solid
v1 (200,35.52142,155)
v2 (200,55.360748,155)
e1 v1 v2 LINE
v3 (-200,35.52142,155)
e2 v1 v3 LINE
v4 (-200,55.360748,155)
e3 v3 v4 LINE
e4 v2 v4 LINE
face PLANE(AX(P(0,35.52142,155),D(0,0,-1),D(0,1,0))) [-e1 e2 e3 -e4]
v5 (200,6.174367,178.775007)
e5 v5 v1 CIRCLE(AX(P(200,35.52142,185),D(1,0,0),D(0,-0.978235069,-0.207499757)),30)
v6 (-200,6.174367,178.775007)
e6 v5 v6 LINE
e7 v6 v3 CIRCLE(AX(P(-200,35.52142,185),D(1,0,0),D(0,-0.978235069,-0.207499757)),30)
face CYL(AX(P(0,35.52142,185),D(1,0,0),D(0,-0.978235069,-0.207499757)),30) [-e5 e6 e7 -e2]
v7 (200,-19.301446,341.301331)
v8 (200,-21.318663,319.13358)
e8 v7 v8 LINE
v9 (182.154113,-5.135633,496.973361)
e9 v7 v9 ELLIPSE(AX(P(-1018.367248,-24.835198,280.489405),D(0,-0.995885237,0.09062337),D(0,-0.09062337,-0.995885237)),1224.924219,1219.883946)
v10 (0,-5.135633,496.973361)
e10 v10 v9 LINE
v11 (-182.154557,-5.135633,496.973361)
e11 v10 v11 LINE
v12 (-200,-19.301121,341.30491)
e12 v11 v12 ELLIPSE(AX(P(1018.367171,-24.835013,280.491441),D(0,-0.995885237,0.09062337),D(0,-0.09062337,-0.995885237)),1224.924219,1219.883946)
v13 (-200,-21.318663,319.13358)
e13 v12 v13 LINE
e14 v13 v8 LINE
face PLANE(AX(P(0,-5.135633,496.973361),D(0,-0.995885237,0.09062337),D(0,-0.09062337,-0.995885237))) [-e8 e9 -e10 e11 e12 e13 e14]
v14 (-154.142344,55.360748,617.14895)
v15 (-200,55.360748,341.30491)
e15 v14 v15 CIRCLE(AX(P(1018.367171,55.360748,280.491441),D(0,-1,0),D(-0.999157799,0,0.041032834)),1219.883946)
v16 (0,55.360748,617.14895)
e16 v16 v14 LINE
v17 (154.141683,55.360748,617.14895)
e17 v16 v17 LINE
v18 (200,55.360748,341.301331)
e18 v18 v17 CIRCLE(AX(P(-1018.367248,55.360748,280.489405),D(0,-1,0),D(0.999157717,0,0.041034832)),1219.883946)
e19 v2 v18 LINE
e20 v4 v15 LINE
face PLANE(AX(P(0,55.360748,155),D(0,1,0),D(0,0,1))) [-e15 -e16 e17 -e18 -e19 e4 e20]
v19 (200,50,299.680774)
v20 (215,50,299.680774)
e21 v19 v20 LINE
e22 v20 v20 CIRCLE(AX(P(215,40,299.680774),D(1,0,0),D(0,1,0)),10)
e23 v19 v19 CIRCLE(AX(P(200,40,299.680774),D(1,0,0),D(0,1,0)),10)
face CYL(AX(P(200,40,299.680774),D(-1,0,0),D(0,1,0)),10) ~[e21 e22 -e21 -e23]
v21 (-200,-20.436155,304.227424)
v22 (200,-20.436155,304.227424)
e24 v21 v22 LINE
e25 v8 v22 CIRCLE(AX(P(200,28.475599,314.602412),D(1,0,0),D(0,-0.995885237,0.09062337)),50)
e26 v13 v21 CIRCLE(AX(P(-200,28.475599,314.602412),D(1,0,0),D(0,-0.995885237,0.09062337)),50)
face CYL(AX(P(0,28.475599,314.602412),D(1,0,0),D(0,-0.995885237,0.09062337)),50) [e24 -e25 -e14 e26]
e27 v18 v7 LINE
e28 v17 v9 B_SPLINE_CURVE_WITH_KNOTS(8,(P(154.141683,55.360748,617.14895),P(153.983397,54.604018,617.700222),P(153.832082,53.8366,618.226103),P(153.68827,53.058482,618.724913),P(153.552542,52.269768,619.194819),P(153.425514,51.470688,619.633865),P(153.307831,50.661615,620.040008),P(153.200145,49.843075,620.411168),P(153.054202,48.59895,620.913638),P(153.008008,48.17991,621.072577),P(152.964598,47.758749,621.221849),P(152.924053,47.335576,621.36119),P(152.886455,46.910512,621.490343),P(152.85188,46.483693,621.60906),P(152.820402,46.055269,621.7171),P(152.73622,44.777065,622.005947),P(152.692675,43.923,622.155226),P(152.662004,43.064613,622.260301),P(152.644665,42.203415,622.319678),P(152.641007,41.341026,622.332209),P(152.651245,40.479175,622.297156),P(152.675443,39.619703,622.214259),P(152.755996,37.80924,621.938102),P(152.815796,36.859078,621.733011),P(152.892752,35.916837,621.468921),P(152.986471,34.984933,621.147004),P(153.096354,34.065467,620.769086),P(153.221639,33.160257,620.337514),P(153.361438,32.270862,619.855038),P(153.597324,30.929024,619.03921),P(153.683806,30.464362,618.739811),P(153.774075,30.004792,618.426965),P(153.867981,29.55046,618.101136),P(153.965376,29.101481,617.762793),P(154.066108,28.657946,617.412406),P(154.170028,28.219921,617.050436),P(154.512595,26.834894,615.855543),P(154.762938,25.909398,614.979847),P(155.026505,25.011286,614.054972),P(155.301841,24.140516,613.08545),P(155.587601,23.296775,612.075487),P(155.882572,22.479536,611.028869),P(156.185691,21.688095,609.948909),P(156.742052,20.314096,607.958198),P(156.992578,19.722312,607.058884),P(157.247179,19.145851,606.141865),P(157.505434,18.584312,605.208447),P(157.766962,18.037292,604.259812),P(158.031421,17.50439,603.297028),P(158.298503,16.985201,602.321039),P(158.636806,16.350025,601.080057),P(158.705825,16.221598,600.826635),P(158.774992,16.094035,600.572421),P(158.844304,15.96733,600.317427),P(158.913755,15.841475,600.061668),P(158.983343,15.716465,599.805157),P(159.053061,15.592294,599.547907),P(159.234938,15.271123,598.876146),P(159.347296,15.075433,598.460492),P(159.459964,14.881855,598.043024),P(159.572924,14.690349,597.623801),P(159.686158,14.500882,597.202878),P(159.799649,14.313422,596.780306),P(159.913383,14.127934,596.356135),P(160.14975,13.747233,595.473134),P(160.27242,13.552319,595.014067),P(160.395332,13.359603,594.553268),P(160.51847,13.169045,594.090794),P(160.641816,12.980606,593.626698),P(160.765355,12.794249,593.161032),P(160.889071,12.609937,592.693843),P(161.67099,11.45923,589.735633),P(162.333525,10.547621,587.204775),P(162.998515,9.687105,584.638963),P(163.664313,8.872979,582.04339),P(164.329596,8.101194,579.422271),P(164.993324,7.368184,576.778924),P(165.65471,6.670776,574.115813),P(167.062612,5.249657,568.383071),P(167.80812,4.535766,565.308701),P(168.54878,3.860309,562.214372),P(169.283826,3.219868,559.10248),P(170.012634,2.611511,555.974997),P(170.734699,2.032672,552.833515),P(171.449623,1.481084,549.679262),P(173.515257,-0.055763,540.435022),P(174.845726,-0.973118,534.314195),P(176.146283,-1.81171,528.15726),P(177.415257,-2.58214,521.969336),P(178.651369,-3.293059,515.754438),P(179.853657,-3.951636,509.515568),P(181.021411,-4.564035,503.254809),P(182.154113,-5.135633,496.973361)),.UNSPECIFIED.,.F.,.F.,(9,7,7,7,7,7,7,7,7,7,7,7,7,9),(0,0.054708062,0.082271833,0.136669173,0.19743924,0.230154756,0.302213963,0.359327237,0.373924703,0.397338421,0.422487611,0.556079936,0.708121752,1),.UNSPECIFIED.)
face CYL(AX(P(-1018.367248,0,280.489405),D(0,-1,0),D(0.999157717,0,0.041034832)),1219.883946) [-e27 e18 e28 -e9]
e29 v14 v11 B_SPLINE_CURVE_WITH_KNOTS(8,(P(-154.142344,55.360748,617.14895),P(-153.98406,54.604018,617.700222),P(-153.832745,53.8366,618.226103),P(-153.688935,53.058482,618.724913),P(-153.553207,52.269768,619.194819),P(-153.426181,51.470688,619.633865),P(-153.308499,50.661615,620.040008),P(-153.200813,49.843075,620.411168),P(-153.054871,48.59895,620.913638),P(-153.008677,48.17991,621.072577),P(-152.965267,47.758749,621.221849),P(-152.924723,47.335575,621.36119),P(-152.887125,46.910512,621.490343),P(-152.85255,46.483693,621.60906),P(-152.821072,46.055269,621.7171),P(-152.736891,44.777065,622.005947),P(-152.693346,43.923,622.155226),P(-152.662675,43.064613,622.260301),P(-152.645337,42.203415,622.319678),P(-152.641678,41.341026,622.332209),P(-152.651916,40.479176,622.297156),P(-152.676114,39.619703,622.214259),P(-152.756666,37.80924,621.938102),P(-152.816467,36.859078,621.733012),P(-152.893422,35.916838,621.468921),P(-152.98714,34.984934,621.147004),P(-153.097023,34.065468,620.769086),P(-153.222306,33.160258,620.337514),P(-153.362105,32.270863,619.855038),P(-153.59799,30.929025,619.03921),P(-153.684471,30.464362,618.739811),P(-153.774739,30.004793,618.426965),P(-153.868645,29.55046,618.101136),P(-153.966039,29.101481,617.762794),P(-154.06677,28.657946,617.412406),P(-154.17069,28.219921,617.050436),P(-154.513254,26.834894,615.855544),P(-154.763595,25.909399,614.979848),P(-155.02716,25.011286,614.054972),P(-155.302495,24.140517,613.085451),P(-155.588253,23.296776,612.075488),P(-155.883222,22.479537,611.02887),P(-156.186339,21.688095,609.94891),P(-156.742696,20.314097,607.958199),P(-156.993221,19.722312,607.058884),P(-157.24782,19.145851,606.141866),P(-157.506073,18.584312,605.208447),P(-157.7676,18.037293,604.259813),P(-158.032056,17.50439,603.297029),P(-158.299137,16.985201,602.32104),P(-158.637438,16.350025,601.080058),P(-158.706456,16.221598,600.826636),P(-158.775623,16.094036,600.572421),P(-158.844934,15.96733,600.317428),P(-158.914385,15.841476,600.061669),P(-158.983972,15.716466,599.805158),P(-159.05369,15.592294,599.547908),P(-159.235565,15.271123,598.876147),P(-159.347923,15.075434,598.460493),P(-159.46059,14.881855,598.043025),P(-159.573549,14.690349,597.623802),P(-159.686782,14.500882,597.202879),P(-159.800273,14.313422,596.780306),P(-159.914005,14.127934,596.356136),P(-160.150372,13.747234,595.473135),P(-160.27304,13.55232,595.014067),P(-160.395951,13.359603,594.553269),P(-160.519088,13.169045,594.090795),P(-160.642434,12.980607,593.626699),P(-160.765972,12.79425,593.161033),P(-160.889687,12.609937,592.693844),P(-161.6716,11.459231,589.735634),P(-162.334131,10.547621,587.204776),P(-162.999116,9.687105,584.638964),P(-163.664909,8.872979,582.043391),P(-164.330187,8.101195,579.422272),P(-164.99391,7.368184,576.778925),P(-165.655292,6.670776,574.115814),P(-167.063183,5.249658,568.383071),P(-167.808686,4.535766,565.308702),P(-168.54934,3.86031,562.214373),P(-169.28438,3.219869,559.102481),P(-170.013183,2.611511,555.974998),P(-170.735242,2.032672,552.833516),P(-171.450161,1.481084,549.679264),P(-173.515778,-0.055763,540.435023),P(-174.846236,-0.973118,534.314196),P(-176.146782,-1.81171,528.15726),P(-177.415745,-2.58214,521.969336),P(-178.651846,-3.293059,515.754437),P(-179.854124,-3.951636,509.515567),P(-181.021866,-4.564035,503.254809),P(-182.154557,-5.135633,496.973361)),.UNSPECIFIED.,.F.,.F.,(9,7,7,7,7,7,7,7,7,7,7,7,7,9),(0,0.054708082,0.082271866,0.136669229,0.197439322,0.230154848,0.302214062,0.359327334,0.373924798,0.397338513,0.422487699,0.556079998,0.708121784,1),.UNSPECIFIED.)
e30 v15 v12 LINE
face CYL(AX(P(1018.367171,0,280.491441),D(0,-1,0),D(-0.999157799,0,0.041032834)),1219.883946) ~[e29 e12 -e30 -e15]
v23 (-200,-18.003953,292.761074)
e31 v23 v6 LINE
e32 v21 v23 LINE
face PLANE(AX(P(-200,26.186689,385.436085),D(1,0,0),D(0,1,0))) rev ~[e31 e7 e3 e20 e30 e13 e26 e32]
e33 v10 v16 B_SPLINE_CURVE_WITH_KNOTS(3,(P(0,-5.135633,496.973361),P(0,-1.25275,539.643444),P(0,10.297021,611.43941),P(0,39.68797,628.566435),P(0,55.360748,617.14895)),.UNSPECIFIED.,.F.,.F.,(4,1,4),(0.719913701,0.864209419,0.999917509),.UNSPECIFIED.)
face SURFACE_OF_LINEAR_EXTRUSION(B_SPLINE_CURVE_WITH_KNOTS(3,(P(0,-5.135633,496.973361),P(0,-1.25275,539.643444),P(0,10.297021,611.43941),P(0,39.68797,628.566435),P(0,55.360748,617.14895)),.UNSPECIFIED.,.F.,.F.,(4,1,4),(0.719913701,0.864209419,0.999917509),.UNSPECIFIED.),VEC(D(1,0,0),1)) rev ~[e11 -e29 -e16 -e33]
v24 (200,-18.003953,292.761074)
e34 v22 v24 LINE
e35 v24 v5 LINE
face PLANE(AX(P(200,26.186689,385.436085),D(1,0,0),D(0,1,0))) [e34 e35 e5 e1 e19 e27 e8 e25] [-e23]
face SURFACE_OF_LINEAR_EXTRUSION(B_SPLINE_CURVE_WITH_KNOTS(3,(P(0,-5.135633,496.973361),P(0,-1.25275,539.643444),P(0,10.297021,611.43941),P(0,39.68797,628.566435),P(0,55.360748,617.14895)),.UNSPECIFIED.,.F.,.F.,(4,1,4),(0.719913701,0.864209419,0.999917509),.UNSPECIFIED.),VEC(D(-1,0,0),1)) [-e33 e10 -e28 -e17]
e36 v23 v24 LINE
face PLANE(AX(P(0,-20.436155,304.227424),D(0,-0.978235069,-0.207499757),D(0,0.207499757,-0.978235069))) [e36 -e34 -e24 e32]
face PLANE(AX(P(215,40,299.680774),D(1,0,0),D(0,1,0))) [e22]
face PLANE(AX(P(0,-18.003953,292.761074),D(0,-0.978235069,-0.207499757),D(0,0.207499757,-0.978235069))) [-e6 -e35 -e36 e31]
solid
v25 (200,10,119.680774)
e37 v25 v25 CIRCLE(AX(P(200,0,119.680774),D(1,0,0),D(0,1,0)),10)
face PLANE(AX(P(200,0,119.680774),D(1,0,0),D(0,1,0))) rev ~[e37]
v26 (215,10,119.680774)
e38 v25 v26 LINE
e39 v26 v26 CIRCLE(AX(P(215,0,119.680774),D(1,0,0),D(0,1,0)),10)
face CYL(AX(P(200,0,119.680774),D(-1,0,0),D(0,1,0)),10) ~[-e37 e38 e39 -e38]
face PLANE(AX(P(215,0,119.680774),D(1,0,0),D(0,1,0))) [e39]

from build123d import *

# Parameters (mm, degrees)
F1_DEPTH = 200
F4_DEPTH = 100
F2_R     = 10
F5_DEPTH = 15


# Not quite as in the source:
# - a feature of the source that left no trace in its solid (it failed there, or was rolled back) is left out
# - a pattern or mirror of a feature is missing from the dataset's text; its kind, count and spacing are read off the source's solid
# - a feature names something its author has since deleted; it is built from what else it names


with BuildPart() as f1:
    # F0 (on Right) → F1 (new body, symmetric)
    with BuildSketch(Plane.YZ):
        with BuildLine():
            Line((55.3607484261, 155), (55.3607484261, 617.148949861))
            add(Edge.make_bspline(
                [(-5.1356334681, 496.9733605758), (-1.2527495457, 539.6434441922), (10.2970207059, 611.4394103819), (39.6879700651, 628.5664346662), (55.3607484261, 617.148949861)],
                knots=[0.7199137006, 0.7199137006, 0.7199137006, 0.7199137006, 0.8642094186, 0.999917509, 0.999917509, 0.999917509, 0.999917509], degree=3))
            add(Edge.make_bspline(
                [(-18.0039532914, 292.7610744649), (-17.7275211213, 295.6500029476), (-12.1238736433, 356.7123411708), (-10.7984274846, 434.7433534423), (-5.1356334681, 496.9733605758)],
                knots=[0.4988819934, 0.4988819934, 0.4988819934, 0.4988819934, 0.5094729702, 0.7199137006, 0.7199137006, 0.7199137006, 0.7199137006], degree=3))
            Line((-18.0039532914, 292.7610744649), (6.1743674758, 178.7750072777))
            ThreePointArc((6.1743674758, 178.7750072777), (16.6368991944, 161.6895969397), (35.5214195528, 155))
            Line((35.5214195528, 155), (55.3607484261, 155))
        make_face()
        with BuildLine():
            add(Edge.make_bspline(
                [(-18.0039532914, 292.7610744649), (-17.7275211213, 295.6500029476), (-12.1238736433, 356.7123411708), (-10.7984274846, 434.7433534423), (-5.1356334681, 496.9733605758)],
                knots=[0.4988819934, 0.4988819934, 0.4988819934, 0.4988819934, 0.5094729702, 0.7199137006, 0.7199137006, 0.7199137006, 0.7199137006], degree=3))
            Line((-5.1356334681, 496.9733605758), (-21.3186630339, 319.1335800048))
            ThreePointArc((-21.3186630339, 319.1335800048), (-21.4370021949, 311.6473714943), (-20.436154657, 304.2274236355))
            Line((-20.436154657, 304.2274236355), (-18.0039532914, 292.7610744649))
        make_face()
    extrude(amount=F1_DEPTH, both=True)

    # F3 (on Front) → F4 (cut, symmetric)
    with BuildSketch(Plane.XZ):
        with BuildLine():
            ThreePointArc((-200.4893869162, 330.5467367172), (-184.2445033895, 485.0446179169), (-148.4963000619, 636.2251639366))
            Line((-148.4963000619, 636.2251639366), (-242.7955716848, 636.2251639366))
            Line((-242.7955716848, 636.2251639366), (-242.7955716848, 330.5467367172))
            Line((-242.7955716848, 330.5467367172), (-200.4893869162, 330.5467367172))
        make_face()
    f4 = extrude(amount=F4_DEPTH, both=True, mode=Mode.SUBTRACT)

    # F4_copies: F4 across plane
    add(f4.mirror(Plane(origin=(0.000242, 0, 0), x_dir=(-1e-06, 0, 1), z_dir=(1, 0, 1e-06))), mode=Mode.SUBTRACT)

    # F2 (on face) → F5 (join)
    with BuildSketch(Plane.YZ.offset(200)):
        with Locations((40, 299.6807744877)):
            Circle(F2_R)
    extrude(amount=F5_DEPTH)


with BuildPart() as f5:
    # F2 (on face) → F5, piece 2 (new body)
    with BuildSketch(Plane.YZ.offset(200)):
        with Locations((0, 119.6807744877)):
            Circle(F2_R)
    extrude(amount=F5_DEPTH)


solid = Compound([f1.part, f5.part])
